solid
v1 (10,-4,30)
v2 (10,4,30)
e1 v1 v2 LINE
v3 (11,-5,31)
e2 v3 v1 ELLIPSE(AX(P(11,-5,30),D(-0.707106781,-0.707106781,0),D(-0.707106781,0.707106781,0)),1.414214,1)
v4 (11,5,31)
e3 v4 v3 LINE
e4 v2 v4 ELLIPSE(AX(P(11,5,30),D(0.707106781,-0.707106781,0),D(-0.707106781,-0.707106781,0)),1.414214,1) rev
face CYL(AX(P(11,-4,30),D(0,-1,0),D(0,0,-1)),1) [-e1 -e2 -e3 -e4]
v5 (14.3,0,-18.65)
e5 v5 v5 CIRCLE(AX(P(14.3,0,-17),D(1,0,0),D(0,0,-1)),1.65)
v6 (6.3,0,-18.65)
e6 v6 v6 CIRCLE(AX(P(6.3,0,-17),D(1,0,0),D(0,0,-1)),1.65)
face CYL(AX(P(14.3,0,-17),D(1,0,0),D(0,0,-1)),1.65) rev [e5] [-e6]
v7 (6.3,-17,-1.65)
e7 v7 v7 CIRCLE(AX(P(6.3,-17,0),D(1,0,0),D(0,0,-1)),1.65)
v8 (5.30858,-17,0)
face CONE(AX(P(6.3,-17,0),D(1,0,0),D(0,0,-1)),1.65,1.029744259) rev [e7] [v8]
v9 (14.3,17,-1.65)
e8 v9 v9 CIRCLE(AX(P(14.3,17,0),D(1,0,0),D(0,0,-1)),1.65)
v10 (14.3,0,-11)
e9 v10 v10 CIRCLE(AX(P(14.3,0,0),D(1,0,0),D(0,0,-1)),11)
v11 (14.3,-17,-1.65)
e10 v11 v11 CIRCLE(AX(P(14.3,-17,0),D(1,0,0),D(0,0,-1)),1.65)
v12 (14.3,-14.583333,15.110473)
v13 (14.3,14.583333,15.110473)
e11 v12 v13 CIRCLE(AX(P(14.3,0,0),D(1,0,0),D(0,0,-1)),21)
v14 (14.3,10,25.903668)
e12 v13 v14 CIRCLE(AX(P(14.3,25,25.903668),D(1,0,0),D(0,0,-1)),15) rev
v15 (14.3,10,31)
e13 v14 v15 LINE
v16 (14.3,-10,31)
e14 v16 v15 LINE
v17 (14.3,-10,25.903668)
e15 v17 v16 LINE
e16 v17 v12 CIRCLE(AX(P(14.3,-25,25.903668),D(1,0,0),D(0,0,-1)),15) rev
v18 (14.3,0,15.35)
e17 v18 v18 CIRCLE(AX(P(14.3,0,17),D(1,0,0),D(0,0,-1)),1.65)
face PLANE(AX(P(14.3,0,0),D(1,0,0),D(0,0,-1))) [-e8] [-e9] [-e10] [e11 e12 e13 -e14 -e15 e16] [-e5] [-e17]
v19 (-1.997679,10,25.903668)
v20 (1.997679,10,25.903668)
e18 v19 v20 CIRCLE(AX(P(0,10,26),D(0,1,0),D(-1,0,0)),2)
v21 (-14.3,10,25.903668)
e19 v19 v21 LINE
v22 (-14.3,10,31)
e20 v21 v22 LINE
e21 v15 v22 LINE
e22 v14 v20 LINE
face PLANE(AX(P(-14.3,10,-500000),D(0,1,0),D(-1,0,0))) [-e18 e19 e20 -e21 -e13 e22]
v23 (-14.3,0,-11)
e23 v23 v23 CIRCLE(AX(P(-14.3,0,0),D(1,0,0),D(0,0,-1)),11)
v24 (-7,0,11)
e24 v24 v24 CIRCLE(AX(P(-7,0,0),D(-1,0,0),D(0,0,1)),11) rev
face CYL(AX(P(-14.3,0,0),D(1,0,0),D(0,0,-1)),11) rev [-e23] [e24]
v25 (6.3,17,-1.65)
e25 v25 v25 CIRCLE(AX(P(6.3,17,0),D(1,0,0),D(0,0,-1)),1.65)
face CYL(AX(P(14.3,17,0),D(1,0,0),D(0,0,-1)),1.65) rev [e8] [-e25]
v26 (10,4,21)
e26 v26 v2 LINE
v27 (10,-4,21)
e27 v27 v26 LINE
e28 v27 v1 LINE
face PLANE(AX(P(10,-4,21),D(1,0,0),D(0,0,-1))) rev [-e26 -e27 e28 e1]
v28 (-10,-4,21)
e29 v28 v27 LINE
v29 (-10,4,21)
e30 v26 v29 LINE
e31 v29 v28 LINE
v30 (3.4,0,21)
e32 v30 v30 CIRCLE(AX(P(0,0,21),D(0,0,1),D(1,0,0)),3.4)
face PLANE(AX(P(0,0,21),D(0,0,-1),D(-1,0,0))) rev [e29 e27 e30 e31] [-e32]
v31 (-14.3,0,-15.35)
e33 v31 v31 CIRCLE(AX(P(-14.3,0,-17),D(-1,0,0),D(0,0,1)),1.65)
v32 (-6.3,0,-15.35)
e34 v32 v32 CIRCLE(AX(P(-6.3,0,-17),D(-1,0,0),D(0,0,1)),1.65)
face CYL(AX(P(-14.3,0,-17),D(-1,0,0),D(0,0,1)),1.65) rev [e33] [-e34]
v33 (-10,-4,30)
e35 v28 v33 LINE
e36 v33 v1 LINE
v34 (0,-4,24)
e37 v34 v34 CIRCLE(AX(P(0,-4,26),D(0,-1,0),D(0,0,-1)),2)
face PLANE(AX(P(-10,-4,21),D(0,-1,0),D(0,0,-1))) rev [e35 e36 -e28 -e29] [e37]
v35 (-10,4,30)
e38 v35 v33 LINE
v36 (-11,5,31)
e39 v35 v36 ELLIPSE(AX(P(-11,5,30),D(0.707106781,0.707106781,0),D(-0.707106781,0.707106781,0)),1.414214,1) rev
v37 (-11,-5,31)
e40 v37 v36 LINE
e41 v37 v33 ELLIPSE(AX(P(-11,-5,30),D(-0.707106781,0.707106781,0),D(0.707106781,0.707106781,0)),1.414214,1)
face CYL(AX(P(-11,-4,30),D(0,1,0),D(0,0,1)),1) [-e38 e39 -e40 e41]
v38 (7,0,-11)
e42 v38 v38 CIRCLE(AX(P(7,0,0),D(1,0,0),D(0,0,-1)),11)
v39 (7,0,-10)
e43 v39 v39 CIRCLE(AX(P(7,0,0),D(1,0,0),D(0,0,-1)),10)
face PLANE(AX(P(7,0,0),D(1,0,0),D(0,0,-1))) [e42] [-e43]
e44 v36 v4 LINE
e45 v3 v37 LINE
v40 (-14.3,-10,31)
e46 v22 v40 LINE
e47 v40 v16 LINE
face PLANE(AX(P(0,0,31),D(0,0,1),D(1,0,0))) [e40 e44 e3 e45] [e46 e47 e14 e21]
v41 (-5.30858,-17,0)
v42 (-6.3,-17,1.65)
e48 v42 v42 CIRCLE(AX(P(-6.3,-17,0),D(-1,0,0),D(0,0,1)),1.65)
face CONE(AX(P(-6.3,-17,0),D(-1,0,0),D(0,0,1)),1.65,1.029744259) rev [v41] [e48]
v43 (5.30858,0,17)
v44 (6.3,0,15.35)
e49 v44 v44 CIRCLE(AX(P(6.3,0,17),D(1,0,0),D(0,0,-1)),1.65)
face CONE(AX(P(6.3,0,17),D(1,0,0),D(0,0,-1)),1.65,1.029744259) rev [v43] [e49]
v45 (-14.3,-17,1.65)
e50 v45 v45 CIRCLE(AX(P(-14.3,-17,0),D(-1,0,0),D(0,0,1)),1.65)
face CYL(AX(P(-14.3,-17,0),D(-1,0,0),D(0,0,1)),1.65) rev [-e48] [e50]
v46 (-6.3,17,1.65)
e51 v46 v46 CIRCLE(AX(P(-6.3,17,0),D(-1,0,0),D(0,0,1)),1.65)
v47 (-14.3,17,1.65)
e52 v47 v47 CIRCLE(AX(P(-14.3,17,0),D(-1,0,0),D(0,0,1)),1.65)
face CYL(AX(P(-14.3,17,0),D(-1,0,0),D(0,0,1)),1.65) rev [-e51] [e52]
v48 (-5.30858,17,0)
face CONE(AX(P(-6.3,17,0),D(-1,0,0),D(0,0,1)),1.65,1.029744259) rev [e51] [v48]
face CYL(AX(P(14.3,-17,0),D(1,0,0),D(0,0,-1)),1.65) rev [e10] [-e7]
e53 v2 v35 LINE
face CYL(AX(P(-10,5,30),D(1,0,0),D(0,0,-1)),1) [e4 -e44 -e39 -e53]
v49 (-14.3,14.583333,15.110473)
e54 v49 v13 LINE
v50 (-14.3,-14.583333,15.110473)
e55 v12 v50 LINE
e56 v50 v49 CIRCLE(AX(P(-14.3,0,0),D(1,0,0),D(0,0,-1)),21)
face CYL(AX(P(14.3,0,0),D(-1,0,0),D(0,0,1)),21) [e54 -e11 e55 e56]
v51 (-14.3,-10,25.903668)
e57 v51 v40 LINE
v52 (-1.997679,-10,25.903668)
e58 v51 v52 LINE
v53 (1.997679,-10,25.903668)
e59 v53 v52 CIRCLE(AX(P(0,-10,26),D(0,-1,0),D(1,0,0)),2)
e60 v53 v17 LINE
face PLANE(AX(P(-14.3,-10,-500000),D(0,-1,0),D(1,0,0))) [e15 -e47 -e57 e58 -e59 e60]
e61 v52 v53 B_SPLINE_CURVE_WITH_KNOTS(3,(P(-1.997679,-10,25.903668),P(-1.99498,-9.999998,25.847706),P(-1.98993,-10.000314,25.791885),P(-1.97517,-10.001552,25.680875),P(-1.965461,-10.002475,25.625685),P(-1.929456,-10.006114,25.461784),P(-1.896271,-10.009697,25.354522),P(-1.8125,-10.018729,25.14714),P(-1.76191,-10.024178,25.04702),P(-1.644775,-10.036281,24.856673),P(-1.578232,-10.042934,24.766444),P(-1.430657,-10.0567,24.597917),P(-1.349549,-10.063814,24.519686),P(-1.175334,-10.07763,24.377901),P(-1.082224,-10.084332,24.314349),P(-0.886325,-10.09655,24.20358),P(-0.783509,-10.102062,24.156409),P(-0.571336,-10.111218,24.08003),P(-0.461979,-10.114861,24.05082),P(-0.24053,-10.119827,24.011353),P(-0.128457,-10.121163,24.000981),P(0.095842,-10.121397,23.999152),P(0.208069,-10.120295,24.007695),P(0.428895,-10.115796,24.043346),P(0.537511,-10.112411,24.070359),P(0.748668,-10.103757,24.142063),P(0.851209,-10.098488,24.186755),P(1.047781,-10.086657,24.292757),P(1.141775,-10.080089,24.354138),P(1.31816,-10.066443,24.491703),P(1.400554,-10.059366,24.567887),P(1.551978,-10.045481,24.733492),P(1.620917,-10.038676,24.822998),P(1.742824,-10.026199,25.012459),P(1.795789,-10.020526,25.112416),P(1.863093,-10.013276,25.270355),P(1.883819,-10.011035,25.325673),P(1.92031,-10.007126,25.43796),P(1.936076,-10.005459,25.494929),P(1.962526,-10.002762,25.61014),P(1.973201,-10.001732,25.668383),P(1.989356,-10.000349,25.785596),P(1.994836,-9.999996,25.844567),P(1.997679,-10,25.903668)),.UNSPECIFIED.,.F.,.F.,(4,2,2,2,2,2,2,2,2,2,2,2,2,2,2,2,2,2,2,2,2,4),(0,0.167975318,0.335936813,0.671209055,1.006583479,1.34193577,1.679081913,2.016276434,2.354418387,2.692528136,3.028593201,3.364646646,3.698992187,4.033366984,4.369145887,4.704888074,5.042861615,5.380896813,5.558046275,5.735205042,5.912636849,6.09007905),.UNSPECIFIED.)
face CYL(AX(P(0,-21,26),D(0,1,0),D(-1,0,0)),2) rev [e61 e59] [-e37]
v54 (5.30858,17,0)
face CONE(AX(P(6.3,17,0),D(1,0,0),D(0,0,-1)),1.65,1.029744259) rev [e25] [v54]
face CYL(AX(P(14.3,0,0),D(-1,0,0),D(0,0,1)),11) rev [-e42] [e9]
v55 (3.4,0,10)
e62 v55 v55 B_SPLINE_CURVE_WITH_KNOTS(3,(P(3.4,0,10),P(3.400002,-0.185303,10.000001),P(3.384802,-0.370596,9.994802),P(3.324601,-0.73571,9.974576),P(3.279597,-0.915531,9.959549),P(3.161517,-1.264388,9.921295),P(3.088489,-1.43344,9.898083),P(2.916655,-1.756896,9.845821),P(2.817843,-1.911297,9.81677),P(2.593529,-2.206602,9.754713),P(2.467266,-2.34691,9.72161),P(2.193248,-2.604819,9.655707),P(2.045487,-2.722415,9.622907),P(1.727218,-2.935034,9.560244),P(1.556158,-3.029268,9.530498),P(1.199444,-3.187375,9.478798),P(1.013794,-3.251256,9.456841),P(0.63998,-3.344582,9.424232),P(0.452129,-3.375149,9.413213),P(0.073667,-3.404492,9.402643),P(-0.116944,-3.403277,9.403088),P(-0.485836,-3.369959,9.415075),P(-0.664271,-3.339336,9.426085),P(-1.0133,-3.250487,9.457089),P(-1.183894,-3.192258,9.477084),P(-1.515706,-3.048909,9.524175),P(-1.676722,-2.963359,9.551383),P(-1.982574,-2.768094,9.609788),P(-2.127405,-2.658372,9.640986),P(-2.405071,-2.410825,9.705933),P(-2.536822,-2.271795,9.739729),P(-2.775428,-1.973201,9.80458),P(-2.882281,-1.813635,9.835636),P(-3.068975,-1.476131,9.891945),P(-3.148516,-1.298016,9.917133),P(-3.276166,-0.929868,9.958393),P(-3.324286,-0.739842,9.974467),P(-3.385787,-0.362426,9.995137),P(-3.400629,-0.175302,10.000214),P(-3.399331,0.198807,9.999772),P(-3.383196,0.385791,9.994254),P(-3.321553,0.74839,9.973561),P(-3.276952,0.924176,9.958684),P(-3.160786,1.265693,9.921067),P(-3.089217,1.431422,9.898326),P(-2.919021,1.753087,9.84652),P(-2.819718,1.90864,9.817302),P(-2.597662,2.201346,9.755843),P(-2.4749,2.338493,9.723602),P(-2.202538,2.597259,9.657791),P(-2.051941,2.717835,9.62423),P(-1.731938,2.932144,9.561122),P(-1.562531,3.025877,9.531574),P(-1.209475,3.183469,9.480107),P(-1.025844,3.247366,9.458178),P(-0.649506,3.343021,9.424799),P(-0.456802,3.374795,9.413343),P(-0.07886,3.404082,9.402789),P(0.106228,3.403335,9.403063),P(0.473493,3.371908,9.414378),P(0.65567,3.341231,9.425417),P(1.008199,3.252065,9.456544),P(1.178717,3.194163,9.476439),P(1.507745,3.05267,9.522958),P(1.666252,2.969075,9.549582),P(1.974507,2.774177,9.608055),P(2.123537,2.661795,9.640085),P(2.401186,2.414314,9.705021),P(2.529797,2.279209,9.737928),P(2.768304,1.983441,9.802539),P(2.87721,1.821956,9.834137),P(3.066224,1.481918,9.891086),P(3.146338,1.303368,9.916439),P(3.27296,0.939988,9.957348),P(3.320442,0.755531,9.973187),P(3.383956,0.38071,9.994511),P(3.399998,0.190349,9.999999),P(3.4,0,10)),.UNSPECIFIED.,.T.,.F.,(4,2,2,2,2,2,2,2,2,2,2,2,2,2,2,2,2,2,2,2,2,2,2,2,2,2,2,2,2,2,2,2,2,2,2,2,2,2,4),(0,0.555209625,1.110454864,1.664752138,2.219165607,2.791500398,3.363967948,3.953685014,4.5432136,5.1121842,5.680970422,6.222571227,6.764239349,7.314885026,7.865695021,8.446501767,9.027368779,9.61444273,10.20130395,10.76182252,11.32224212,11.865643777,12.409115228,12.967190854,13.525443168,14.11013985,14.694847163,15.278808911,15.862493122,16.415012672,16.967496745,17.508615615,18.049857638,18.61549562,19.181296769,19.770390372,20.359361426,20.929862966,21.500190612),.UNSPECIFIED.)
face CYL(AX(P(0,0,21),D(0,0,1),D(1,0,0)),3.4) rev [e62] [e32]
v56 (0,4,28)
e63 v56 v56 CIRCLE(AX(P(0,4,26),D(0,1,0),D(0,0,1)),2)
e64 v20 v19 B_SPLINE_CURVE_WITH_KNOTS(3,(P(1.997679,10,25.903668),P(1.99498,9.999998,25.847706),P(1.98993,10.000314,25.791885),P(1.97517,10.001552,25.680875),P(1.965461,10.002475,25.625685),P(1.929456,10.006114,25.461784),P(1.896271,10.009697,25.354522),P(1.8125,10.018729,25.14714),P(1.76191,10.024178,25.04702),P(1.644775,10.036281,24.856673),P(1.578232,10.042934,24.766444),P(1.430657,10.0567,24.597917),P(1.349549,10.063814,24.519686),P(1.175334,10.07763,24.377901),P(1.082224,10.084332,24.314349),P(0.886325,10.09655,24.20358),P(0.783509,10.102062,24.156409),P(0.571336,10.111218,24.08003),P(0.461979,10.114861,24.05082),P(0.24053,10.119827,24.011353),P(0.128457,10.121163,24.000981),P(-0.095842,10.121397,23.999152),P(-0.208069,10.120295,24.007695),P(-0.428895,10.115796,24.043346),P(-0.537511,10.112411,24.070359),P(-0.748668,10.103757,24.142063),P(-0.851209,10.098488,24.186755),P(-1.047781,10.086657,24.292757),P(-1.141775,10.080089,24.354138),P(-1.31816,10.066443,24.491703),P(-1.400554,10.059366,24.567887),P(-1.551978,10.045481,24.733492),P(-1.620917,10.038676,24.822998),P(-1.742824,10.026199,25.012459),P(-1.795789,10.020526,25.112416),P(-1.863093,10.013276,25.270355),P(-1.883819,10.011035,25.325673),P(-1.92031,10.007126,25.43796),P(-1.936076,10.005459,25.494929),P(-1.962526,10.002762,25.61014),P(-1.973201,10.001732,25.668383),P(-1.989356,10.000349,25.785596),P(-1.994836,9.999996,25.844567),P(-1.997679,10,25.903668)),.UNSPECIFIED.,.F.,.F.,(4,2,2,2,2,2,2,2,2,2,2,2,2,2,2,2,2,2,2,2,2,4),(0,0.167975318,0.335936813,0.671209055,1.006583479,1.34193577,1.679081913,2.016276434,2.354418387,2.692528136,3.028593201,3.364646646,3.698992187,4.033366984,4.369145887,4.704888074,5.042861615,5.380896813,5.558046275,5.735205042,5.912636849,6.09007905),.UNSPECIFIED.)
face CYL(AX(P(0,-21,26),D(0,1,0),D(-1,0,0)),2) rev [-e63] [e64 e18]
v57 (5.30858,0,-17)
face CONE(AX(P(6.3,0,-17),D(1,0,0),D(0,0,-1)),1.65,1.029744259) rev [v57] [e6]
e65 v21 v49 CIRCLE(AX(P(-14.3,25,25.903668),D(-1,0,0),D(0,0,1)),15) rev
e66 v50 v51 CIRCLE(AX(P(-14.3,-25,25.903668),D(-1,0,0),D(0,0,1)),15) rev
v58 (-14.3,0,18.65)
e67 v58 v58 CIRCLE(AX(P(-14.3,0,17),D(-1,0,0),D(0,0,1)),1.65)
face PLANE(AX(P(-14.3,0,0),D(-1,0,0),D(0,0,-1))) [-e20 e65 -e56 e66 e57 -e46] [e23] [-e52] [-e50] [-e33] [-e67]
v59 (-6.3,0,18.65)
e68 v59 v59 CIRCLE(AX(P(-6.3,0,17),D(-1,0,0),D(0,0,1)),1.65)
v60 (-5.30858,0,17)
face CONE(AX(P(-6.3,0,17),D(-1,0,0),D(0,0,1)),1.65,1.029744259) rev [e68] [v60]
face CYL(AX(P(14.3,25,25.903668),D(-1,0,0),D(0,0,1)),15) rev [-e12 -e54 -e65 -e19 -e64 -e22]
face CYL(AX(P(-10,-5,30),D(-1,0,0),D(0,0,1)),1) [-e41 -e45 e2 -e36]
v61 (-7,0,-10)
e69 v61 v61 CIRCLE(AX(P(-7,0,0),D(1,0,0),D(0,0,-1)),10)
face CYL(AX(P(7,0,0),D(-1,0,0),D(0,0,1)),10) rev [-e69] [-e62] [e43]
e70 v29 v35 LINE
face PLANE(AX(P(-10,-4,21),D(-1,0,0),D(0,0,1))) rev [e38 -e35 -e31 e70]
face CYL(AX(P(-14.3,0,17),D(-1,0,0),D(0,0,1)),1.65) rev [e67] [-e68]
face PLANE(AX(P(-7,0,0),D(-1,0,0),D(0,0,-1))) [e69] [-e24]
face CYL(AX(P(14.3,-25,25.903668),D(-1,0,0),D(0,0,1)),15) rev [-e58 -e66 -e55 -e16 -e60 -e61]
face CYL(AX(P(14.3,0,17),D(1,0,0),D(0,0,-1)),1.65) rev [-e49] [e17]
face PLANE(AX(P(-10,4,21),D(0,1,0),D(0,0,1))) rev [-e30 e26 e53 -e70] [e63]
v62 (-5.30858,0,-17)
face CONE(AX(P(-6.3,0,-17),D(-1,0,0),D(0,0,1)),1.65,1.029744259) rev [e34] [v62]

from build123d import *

# Parameters (mm, degrees)
SKETCH3_R                  = 21
SKETCH3_R_2                = 11
BOSS_EXTRUDE1_DEPTH        = 14.3
SKETCH4_R                  = 21
SKETCH4_R_2                = 10
BOSS_EXTRUDE2_DEPTH        = 7
M4_TAPPED_HOLE1_AT_2_COUNT = 2
M4_TAPPED_HOLE1_AT_2_PITCH = 24.04163056
M4_TAPPED_HOLE1_AT_3_COUNT = 2
M4_TAPPED_HOLE1_AT_3_PITCH = 34
M4_TAPPED_HOLE1_AT_4_COUNT = 2
M4_TAPPED_HOLE1_AT_4_PITCH = 24.04163056
BOSS_EXTRUDE3_REACH        = 59.875
BOSS_EXTRUDE3_END_RADIUS   = 21
SKETCH7_W                  = 28.6
SKETCH7_H                  = 20
SKETCH11_W                 = 20
SKETCH11_H                 = 8
CUT_EXTRUDE2_DEPTH         = 10
SKETCH12_R                 = 2
CUT_EXTRUDE3_DEPTH         = 47.113880774
FILLET1_R                  = 15
FILLET5_R                  = 1
M8_TAPPED_HOLE1_D          = 6.8
M8_TAPPED_HOLE1_DEPTH      = 19.75
M8_TAPPED_HOLE1_TIP        = 2.042926105


with BuildPart() as part:
    # Sketch3 → Boss-Extrude1 (new body)
    with BuildSketch(Plane(origin=(0, 0, 0), x_dir=(0, 0, -1), z_dir=(1, 0, 0))):
        Circle(SKETCH3_R)
        Circle(SKETCH3_R_2, mode=Mode.SUBTRACT)
    boss_extrude1 = extrude(amount=BOSS_EXTRUDE1_DEPTH)

    # Sketch4 → Boss-Extrude2 (add)
    with BuildSketch(Plane(origin=(0, 0, 0), x_dir=(0, 0, -1), z_dir=(1, 0, 0))):
        Circle(SKETCH4_R)
        Circle(SKETCH4_R_2, mode=Mode.SUBTRACT)
    boss_extrude2 = extrude(amount=BOSS_EXTRUDE2_DEPTH)

    # Sketch15 → M4 Tapped Hole1 (revolve, cut)
    with BuildSketch(Plane(origin=(14.3, 17, 0), x_dir=(0, 0, -1), z_dir=(0, 1, 0))):
        Polygon((0, 0), (0, 8.991420021), (1.65, 8), (1.65, 0), align=None)
    m4_tapped_hole1 = revolve(axis=Axis((20.65, 17, 0), (-1, 0, 0)), mode=Mode.SUBTRACT)

    # M4 Tapped Hole1 at 2: M4 Tapped Hole1 ×2
    with Locations(*[Vector(0, -0.7071067811865479, -0.7071067811865472) * (i * M4_TAPPED_HOLE1_AT_2_PITCH) for i in range(1, M4_TAPPED_HOLE1_AT_2_COUNT)]):
        add(m4_tapped_hole1, mode=Mode.SUBTRACT)

    # M4 Tapped Hole1 at 3: M4 Tapped Hole1 ×2
    with Locations(*[(0, -i * M4_TAPPED_HOLE1_AT_3_PITCH, 0) for i in range(1, M4_TAPPED_HOLE1_AT_3_COUNT)]):
        add(m4_tapped_hole1, mode=Mode.SUBTRACT)

    # M4 Tapped Hole1 at 4: M4 Tapped Hole1 ×2
    with Locations(*[Vector(0, -0.7071067811865474, 0.7071067811865478) * (i * M4_TAPPED_HOLE1_AT_4_PITCH) for i in range(1, M4_TAPPED_HOLE1_AT_4_COUNT)]):
        add(m4_tapped_hole1, mode=Mode.SUBTRACT)

    # Mirror1: Boss-Extrude1, Boss-Extrude2, M4 Tapped Hole1 across plane
    add(boss_extrude1.mirror(Plane(origin=(0, 0, 0), x_dir=(0, 0, 1), z_dir=(1, 0, 0))))
    add(boss_extrude2.mirror(Plane(origin=(0, 0, 0), x_dir=(0, 0, 1), z_dir=(1, 0, 0))))
    add(m4_tapped_hole1.mirror(Plane(origin=(0, 0, 0), x_dir=(0, 0, 1), z_dir=(1, 0, 0))), mode=Mode.SUBTRACT)

    # Mirror1 copy 1 sketch → Mirror1 copy 1 (revolve, cut)
    with BuildSketch(Plane(origin=(-14.3, 0, -17), x_dir=(0, 0, -1), z_dir=(0, 1, 0))):
        Polygon((0, 0), (0, -8.991420021), (1.65, -8), (1.65, 0), align=None)
    revolve(axis=Axis((-20.65, 0, -17), (-1, 0, 0)), mode=Mode.SUBTRACT)

    # Mirror1 copy 2 sketch → Mirror1 copy 2 (revolve, cut)
    with BuildSketch(Plane(origin=(-14.3, -17, 0), x_dir=(0, 0, -1), z_dir=(0, 1, 0))):
        Polygon((0, 0), (0, -8.991420021), (1.65, -8), (1.65, 0), align=None)
    revolve(axis=Axis((-20.65, -17, 0), (-1, 0, 0)), mode=Mode.SUBTRACT)

    # Mirror1 copy 3 sketch → Mirror1 copy 3 (revolve, cut)
    with BuildSketch(Plane(origin=(-14.3, 0, 17), x_dir=(0, 0, -1), z_dir=(0, 1, 0))):
        Polygon((0, 0), (0, -8.991420021), (1.65, -8), (1.65, 0), align=None)
    revolve(axis=Axis((-20.65, 0, 17), (-1, 0, 0)), mode=Mode.SUBTRACT)

    # Boss-Extrude3: up to this cylinder (the profile starts outside it)
    boss_extrude3_end = Plane(origin=(0, 0, 0), z_dir=(-1, 0, 0)) * Cylinder(BOSS_EXTRUDE3_END_RADIUS, 162.75, mode=Mode.PRIVATE)
    # Sketch7 → Boss-Extrude3 (add, up to the surface)
    with BuildSketch(Plane.XY.offset(31), mode=Mode.PRIVATE) as boss_extrude3_sk1:
        Rectangle(SKETCH7_W, SKETCH7_H)
    boss_extrude3_tool1 = extrude(boss_extrude3_sk1.sketch, amount=-BOSS_EXTRUDE3_REACH, mode=Mode.PRIVATE) - boss_extrude3_end
    add(boss_extrude3_tool1.solids().sort_by_distance((0, 0, 31))[0])

    # Sketch11 → Cut-Extrude2 (cut)
    with BuildSketch(Plane.XY.offset(31)):
        Rectangle(SKETCH11_W, SKETCH11_H)
    extrude(amount=-CUT_EXTRUDE2_DEPTH, mode=Mode.SUBTRACT)

    # Sketch12 → Cut-Extrude3 (cut, through all)
    with BuildSketch(Plane(origin=(0, 10, 0), x_dir=(1, 0, 0), z_dir=(0, 1, 0))):
        with Locations(Location((0, -26, 0), (0, 0, 180))):
            Circle(SKETCH12_R)
    extrude(amount=-CUT_EXTRUDE3_DEPTH, mode=Mode.SUBTRACT)

    # Fillet1
    # the kernel refuses this fillet: 15 mm, written as the material it adds along each edge
    with BuildSketch(Plane(origin=(14.3, -10, 18.466185313), x_dir=(0, -0.8068579760983849, -0.5907454666829176), z_dir=(-1, 0, 0))) as fillet1_piece_1_section:
        with BuildLine():
            CenterArc((7.709210641, 14.862173982), FILLET1_R, 216.20992664, 46.01703687)
            Line((-4.393659, 6.000991981), (0, 0))
            ThreePointArc((0, 0), (2.840235499, 0.192956426), (5.680470999, 0))
        make_face()
    fillet1_piece_1 = extrude(amount=28.6, mode=Mode.PRIVATE)
    fillet1_piece_1 = fillet1_piece_1 - Plane(origin=(0, -10.967889591, 26), x_dir=(-1, 0, 0), z_dir=(0, 1, 0)) * Cylinder(2, 82, mode=Mode.PRIVATE)
    add(fillet1_piece_1)
    with BuildSketch(Plane(origin=(14.3, 10, 18.466185313), x_dir=(0, 0.8068579760983845, -0.5907454666829182), z_dir=(-1, 0, 0))) as fillet1_piece_2_section:
        with BuildLine():
            CenterArc((7.709210641, -14.862173982), FILLET1_R, 97.773036491, 46.01703687)
            Line((-4.393659, -6.000991981), (0, 0))
            ThreePointArc((0, 0), (2.840235499, -0.192956426), (5.680470999, 0))
        make_face()
    fillet1_piece_2 = extrude(amount=28.6, mode=Mode.PRIVATE)
    fillet1_piece_2 = fillet1_piece_2 - Plane(origin=(0, 10.967889591, 26), x_dir=(-1, 0, 0), z_dir=(0, 1, 0)) * Cylinder(2, 82, mode=Mode.PRIVATE)
    add(fillet1_piece_2)

    # Fillet5
    fillet5_edges = [part.edges().sort_by_distance(p)[0] for p in [
        (10, 0, 31),
        (0, 4, 31),
        (-10, 0, 31),
        (0, -4, 31),
    ]]
    fillet(fillet5_edges, radius=FILLET5_R)

    # M8 Tapped Hole1
    with Locations(Plane.XY.offset(21)):
        with Locations((0, 0)):
            Hole(M8_TAPPED_HOLE1_D / 2, depth=M8_TAPPED_HOLE1_DEPTH)
            with Locations((0, 0, -(M8_TAPPED_HOLE1_DEPTH + M8_TAPPED_HOLE1_TIP / 2))):  # 118° drill point
                Cone(0, M8_TAPPED_HOLE1_D / 2, M8_TAPPED_HOLE1_TIP, mode=Mode.SUBTRACT)


solid = part.part
